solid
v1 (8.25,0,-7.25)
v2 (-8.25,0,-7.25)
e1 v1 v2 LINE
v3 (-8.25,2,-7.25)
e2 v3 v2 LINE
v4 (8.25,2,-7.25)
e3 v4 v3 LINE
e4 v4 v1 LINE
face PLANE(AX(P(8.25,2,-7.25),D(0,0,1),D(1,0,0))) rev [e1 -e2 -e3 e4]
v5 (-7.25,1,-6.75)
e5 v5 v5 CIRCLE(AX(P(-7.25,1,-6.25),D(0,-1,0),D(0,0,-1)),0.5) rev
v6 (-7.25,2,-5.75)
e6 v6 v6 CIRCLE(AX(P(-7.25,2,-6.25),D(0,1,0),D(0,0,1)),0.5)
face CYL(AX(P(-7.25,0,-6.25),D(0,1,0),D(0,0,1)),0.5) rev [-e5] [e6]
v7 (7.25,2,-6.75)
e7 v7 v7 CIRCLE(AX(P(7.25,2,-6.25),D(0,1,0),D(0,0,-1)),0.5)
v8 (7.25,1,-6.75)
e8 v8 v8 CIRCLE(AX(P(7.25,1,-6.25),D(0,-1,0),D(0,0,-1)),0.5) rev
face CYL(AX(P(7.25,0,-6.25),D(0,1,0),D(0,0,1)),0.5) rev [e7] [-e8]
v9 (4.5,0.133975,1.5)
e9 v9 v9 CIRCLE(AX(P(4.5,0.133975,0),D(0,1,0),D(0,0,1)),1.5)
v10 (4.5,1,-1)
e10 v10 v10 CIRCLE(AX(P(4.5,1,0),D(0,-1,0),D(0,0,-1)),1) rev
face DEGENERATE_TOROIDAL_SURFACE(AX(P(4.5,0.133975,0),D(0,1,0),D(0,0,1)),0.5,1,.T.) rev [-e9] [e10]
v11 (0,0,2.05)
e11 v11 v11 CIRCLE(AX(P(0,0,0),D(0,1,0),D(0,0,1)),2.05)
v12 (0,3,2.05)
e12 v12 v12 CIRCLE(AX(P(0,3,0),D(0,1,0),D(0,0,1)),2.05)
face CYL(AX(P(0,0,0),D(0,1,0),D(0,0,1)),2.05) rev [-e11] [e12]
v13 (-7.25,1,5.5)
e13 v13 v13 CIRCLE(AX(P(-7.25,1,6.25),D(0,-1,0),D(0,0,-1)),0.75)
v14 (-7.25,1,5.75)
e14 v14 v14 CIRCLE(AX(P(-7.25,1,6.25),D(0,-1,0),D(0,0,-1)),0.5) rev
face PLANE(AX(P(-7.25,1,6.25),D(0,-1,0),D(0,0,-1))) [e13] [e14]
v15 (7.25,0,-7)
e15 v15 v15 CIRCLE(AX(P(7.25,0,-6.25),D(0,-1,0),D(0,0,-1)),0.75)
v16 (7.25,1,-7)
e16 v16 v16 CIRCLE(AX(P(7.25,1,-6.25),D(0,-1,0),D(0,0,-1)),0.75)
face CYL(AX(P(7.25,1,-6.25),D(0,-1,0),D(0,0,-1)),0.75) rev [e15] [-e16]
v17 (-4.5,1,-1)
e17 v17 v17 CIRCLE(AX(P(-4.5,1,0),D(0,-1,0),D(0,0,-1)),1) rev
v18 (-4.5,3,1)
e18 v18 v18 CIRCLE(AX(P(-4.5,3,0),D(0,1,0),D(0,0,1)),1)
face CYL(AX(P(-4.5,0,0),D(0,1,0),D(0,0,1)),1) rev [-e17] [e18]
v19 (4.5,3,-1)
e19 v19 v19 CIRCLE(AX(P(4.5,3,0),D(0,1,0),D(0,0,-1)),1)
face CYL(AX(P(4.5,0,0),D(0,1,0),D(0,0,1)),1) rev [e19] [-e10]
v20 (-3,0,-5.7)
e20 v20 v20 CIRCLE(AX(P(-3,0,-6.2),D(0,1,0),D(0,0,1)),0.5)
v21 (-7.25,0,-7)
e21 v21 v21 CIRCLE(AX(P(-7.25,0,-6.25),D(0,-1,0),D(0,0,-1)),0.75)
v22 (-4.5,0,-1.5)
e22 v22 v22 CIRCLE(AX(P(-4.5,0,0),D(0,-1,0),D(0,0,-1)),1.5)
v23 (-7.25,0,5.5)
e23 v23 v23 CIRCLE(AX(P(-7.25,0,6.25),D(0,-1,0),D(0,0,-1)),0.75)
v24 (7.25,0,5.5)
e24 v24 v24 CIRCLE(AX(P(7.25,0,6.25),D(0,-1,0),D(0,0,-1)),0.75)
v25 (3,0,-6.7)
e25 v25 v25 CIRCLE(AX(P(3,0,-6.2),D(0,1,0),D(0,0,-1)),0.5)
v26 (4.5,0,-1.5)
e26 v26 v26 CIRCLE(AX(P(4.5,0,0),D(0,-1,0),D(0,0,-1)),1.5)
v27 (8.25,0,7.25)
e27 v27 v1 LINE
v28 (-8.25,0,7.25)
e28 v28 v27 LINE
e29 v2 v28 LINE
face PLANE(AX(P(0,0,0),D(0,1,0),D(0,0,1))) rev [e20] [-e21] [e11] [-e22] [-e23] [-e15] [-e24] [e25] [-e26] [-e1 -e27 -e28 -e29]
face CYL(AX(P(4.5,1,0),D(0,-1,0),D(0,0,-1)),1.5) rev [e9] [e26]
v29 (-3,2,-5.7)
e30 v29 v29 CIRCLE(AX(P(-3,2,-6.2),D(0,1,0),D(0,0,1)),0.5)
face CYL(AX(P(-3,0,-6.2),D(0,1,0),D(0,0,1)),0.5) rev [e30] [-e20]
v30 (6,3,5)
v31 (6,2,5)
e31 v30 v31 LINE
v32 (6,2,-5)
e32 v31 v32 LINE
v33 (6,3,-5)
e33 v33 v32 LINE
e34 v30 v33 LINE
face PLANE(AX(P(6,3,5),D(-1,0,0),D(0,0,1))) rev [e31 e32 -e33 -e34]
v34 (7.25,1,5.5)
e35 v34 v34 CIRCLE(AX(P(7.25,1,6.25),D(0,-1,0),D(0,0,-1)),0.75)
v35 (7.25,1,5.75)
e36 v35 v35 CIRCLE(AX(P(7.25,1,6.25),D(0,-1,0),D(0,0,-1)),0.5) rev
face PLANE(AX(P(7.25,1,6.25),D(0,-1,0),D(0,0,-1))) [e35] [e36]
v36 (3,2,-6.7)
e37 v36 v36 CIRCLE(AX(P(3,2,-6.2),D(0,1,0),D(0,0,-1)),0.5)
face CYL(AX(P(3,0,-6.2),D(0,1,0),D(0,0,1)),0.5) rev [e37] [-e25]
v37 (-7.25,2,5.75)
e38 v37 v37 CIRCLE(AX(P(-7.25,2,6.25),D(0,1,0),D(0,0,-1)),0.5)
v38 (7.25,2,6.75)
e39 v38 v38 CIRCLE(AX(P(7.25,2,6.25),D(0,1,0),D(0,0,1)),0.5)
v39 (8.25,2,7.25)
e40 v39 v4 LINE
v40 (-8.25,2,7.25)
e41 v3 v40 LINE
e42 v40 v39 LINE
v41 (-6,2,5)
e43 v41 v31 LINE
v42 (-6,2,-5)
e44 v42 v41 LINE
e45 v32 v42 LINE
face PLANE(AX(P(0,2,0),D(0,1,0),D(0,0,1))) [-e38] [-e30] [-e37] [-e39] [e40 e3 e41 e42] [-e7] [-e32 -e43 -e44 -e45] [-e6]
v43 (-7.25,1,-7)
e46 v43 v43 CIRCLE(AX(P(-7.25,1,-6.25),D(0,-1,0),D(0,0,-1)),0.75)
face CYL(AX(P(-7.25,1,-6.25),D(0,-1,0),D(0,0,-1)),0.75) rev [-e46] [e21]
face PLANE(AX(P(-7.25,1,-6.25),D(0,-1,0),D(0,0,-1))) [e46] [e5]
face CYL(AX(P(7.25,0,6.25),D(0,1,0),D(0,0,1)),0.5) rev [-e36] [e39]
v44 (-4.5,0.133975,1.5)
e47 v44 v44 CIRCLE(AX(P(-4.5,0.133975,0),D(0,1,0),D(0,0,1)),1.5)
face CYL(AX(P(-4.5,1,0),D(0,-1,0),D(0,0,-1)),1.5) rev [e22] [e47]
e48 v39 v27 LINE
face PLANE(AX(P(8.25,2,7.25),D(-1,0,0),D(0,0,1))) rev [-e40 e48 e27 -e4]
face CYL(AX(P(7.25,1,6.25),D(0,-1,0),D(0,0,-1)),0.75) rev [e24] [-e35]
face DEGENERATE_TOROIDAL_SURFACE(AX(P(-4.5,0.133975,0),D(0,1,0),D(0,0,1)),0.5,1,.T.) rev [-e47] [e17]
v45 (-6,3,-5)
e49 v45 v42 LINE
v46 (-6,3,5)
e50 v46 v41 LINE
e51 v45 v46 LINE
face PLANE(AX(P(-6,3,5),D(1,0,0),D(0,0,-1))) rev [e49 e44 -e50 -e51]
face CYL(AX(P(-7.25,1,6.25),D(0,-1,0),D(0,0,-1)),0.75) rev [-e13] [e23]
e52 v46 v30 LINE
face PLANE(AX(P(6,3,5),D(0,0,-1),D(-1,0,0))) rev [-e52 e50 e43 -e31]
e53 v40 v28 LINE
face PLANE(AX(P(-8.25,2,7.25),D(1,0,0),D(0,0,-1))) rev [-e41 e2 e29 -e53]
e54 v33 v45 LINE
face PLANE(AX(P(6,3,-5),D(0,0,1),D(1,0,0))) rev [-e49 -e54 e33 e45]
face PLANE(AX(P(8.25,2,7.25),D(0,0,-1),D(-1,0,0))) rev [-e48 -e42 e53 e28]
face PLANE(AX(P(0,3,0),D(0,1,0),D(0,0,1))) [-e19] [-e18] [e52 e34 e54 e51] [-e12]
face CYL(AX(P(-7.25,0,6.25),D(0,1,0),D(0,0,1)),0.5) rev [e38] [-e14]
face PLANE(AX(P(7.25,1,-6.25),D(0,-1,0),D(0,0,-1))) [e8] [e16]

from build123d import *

# Parameters (mm, degrees)
SKETCH_1_W          = 16.5
SKETCH_1_H          = 14.5
EXTRUDE_1_DEPTH     = 2
SKETCH_2_W          = 12
SKETCH_2_H          = 10
EXTRUDE_2_DEPTH     = 1
SKETCH_3_R          = 0.5
CUT_EXTRUDE_1_DEPTH = 12.163556781
SKETCH_5_R          = 2.05
SKETCH_5_R_2        = 1
CUT_EXTRUDE_2_DEPTH = 12.385297537
SKETCH_6_R          = 0.75
CUT_EXTRUDE_3_DEPTH = 1
SKETCH_7_R          = 1.5
CUT_EXTRUDE_4_DEPTH = 1
FILLET_1_R          = 1
SKETCH_8_R          = 0.5
CUT_EXTRUDE_5_DEPTH = 12.163556781


with BuildPart() as part:
    # 草图1 → 凸台-拉伸1 (new body)
    with BuildSketch(Plane(origin=(0, 0, 0), x_dir=(1, 0, 0), z_dir=(0, 1, 0))):
        Rectangle(SKETCH_1_W, SKETCH_1_H)
    extrude(amount=EXTRUDE_1_DEPTH)

    # 草图2 → 凸台-拉伸2 (add)
    with BuildSketch(Plane(origin=(0, 2, 0), x_dir=(1, 0, 0), z_dir=(0, 1, 0))):
        Rectangle(SKETCH_2_W, SKETCH_2_H)
    extrude(amount=EXTRUDE_2_DEPTH)

    # 草图3 → 切除-拉伸1 (cut, through all)
    with BuildSketch(Plane(origin=(0, 2, 0), x_dir=(1, 0, 0), z_dir=(0, 1, 0))):
        with Locations(Location((-7.25, 6.25, 0), (0, 0, 270))):
            Circle(SKETCH_3_R)
        with Locations(Location((7.25, 6.25, 0), (0, 0, 90))):
            Circle(SKETCH_3_R)
        with Locations(Location((7.25, -6.25, 0), (0, 0, 270))):
            Circle(SKETCH_3_R)
        with Locations(Location((-7.25, -6.25, 0), (0, 0, 90))):
            Circle(SKETCH_3_R)
    extrude(amount=-CUT_EXTRUDE_1_DEPTH, mode=Mode.SUBTRACT)

    # 草图5 → 切除-拉伸2 (cut, through all)
    with BuildSketch(Plane(origin=(0, 3, 0), x_dir=(1, 0, 0), z_dir=(0, 1, 0))):
        with Locations(Location((0, 0, 0), (0, 0, 270))):
            Circle(SKETCH_5_R)
        with Locations(Location((-4.5, 0, 0), (0, 0, 270))):
            Circle(SKETCH_5_R_2)
        with Locations(Location((4.5, 0, 0), (0, 0, 90))):
            Circle(SKETCH_5_R_2)
    extrude(amount=-CUT_EXTRUDE_2_DEPTH, mode=Mode.SUBTRACT)

    # 草图6 → 切除-拉伸3 (cut)
    with BuildSketch(Plane.XZ):
        with Locations(Location((7.25, -6.25, 0), (0, 0, 270))):
            Circle(SKETCH_6_R)
        with Locations(Location((-7.25, -6.25, 0), (0, 0, 270))):
            Circle(SKETCH_6_R)
        with Locations(Location((7.25, 6.25, 0), (0, 0, 270))):
            Circle(SKETCH_6_R)
        with Locations(Location((-7.25, 6.25, 0), (0, 0, 270))):
            Circle(SKETCH_6_R)
    extrude(amount=-CUT_EXTRUDE_3_DEPTH, mode=Mode.SUBTRACT)

    # 草图7 → 切除-拉伸4 (cut)
    with BuildSketch(Plane.XZ):
        with Locations(Location((-4.5, 0, 0), (0, 0, 270))):
            Circle(SKETCH_7_R)
        with Locations(Location((4.5, 0, 0), (0, 0, 270))):
            Circle(SKETCH_7_R)
    extrude(amount=-CUT_EXTRUDE_4_DEPTH, mode=Mode.SUBTRACT)

    # 圆角1
    # the kernel refuses this fillet: 1 mm, written as the material it adds along each edge
    with BuildSketch(Plane(origin=(-4.5, 1, 0), x_dir=(0, 0, -1), z_dir=(-1, 0, 0))) as fillet_1_piece_1_section:
        with BuildLine():
            CenterArc((0.5, 0.866025404), FILLET_1_R, 300, 60)
            Line((1, 0), (1.01, -0.017320508))
            ThreePointArc((1.01, -0.017320508), (1.25, -0.02), (1.5, -0.02))
            Line((1.5, -0.02), (1.52, 0))
            Line((1.52, 0), (1.52, 0.866025404))
            Line((1.52, 0.866025404), (1.5, 0.866025404))
        make_face()
    fillet_1_piece_1 = revolve(axis=Axis((-4.5, 1, 0), (0, -1, 0)), mode=Mode.PRIVATE)
    fillet_1_piece_1 = fillet_1_piece_1 - Plane(origin=(-4.5, 0.639457319, 0), x_dir=(0, 0, 1), z_dir=(0, 1, 0)) * Cylinder(1, 7, mode=Mode.PRIVATE)
    add(fillet_1_piece_1)
    with BuildSketch(Plane(origin=(4.5, 1, 0), x_dir=(0, 0, -1), z_dir=(-1, 0, 0))) as fillet_1_piece_2:
        with BuildLine():
            CenterArc((0.5, 0.866025404), FILLET_1_R, 300, 60)
            Line((1, 0), (1.01, -0.017320508))
            ThreePointArc((1.01, -0.017320508), (1.25, -0.02), (1.5, -0.02))
            Line((1.5, -0.02), (1.52, 0))
            Line((1.52, 0), (1.52, 0.866025404))
            Line((1.52, 0.866025404), (1.5, 0.866025404))
        make_face()
    revolve(axis=Axis((4.5, 1, 0), (0, -1, 0)))

    # 草图8 → 切除-拉伸5 (cut, through all)
    with BuildSketch(Plane(origin=(0, 2, 0), x_dir=(1, 0, 0), z_dir=(0, 1, 0))):
        with Locations(Location((-3, 6.2, 0), (0, 0, 270))):
            Circle(SKETCH_8_R)
        with Locations(Location((3, 6.2, 0), (0, 0, 90))):
            Circle(SKETCH_8_R)
    extrude(amount=-CUT_EXTRUDE_5_DEPTH, mode=Mode.SUBTRACT)


solid = part.part
